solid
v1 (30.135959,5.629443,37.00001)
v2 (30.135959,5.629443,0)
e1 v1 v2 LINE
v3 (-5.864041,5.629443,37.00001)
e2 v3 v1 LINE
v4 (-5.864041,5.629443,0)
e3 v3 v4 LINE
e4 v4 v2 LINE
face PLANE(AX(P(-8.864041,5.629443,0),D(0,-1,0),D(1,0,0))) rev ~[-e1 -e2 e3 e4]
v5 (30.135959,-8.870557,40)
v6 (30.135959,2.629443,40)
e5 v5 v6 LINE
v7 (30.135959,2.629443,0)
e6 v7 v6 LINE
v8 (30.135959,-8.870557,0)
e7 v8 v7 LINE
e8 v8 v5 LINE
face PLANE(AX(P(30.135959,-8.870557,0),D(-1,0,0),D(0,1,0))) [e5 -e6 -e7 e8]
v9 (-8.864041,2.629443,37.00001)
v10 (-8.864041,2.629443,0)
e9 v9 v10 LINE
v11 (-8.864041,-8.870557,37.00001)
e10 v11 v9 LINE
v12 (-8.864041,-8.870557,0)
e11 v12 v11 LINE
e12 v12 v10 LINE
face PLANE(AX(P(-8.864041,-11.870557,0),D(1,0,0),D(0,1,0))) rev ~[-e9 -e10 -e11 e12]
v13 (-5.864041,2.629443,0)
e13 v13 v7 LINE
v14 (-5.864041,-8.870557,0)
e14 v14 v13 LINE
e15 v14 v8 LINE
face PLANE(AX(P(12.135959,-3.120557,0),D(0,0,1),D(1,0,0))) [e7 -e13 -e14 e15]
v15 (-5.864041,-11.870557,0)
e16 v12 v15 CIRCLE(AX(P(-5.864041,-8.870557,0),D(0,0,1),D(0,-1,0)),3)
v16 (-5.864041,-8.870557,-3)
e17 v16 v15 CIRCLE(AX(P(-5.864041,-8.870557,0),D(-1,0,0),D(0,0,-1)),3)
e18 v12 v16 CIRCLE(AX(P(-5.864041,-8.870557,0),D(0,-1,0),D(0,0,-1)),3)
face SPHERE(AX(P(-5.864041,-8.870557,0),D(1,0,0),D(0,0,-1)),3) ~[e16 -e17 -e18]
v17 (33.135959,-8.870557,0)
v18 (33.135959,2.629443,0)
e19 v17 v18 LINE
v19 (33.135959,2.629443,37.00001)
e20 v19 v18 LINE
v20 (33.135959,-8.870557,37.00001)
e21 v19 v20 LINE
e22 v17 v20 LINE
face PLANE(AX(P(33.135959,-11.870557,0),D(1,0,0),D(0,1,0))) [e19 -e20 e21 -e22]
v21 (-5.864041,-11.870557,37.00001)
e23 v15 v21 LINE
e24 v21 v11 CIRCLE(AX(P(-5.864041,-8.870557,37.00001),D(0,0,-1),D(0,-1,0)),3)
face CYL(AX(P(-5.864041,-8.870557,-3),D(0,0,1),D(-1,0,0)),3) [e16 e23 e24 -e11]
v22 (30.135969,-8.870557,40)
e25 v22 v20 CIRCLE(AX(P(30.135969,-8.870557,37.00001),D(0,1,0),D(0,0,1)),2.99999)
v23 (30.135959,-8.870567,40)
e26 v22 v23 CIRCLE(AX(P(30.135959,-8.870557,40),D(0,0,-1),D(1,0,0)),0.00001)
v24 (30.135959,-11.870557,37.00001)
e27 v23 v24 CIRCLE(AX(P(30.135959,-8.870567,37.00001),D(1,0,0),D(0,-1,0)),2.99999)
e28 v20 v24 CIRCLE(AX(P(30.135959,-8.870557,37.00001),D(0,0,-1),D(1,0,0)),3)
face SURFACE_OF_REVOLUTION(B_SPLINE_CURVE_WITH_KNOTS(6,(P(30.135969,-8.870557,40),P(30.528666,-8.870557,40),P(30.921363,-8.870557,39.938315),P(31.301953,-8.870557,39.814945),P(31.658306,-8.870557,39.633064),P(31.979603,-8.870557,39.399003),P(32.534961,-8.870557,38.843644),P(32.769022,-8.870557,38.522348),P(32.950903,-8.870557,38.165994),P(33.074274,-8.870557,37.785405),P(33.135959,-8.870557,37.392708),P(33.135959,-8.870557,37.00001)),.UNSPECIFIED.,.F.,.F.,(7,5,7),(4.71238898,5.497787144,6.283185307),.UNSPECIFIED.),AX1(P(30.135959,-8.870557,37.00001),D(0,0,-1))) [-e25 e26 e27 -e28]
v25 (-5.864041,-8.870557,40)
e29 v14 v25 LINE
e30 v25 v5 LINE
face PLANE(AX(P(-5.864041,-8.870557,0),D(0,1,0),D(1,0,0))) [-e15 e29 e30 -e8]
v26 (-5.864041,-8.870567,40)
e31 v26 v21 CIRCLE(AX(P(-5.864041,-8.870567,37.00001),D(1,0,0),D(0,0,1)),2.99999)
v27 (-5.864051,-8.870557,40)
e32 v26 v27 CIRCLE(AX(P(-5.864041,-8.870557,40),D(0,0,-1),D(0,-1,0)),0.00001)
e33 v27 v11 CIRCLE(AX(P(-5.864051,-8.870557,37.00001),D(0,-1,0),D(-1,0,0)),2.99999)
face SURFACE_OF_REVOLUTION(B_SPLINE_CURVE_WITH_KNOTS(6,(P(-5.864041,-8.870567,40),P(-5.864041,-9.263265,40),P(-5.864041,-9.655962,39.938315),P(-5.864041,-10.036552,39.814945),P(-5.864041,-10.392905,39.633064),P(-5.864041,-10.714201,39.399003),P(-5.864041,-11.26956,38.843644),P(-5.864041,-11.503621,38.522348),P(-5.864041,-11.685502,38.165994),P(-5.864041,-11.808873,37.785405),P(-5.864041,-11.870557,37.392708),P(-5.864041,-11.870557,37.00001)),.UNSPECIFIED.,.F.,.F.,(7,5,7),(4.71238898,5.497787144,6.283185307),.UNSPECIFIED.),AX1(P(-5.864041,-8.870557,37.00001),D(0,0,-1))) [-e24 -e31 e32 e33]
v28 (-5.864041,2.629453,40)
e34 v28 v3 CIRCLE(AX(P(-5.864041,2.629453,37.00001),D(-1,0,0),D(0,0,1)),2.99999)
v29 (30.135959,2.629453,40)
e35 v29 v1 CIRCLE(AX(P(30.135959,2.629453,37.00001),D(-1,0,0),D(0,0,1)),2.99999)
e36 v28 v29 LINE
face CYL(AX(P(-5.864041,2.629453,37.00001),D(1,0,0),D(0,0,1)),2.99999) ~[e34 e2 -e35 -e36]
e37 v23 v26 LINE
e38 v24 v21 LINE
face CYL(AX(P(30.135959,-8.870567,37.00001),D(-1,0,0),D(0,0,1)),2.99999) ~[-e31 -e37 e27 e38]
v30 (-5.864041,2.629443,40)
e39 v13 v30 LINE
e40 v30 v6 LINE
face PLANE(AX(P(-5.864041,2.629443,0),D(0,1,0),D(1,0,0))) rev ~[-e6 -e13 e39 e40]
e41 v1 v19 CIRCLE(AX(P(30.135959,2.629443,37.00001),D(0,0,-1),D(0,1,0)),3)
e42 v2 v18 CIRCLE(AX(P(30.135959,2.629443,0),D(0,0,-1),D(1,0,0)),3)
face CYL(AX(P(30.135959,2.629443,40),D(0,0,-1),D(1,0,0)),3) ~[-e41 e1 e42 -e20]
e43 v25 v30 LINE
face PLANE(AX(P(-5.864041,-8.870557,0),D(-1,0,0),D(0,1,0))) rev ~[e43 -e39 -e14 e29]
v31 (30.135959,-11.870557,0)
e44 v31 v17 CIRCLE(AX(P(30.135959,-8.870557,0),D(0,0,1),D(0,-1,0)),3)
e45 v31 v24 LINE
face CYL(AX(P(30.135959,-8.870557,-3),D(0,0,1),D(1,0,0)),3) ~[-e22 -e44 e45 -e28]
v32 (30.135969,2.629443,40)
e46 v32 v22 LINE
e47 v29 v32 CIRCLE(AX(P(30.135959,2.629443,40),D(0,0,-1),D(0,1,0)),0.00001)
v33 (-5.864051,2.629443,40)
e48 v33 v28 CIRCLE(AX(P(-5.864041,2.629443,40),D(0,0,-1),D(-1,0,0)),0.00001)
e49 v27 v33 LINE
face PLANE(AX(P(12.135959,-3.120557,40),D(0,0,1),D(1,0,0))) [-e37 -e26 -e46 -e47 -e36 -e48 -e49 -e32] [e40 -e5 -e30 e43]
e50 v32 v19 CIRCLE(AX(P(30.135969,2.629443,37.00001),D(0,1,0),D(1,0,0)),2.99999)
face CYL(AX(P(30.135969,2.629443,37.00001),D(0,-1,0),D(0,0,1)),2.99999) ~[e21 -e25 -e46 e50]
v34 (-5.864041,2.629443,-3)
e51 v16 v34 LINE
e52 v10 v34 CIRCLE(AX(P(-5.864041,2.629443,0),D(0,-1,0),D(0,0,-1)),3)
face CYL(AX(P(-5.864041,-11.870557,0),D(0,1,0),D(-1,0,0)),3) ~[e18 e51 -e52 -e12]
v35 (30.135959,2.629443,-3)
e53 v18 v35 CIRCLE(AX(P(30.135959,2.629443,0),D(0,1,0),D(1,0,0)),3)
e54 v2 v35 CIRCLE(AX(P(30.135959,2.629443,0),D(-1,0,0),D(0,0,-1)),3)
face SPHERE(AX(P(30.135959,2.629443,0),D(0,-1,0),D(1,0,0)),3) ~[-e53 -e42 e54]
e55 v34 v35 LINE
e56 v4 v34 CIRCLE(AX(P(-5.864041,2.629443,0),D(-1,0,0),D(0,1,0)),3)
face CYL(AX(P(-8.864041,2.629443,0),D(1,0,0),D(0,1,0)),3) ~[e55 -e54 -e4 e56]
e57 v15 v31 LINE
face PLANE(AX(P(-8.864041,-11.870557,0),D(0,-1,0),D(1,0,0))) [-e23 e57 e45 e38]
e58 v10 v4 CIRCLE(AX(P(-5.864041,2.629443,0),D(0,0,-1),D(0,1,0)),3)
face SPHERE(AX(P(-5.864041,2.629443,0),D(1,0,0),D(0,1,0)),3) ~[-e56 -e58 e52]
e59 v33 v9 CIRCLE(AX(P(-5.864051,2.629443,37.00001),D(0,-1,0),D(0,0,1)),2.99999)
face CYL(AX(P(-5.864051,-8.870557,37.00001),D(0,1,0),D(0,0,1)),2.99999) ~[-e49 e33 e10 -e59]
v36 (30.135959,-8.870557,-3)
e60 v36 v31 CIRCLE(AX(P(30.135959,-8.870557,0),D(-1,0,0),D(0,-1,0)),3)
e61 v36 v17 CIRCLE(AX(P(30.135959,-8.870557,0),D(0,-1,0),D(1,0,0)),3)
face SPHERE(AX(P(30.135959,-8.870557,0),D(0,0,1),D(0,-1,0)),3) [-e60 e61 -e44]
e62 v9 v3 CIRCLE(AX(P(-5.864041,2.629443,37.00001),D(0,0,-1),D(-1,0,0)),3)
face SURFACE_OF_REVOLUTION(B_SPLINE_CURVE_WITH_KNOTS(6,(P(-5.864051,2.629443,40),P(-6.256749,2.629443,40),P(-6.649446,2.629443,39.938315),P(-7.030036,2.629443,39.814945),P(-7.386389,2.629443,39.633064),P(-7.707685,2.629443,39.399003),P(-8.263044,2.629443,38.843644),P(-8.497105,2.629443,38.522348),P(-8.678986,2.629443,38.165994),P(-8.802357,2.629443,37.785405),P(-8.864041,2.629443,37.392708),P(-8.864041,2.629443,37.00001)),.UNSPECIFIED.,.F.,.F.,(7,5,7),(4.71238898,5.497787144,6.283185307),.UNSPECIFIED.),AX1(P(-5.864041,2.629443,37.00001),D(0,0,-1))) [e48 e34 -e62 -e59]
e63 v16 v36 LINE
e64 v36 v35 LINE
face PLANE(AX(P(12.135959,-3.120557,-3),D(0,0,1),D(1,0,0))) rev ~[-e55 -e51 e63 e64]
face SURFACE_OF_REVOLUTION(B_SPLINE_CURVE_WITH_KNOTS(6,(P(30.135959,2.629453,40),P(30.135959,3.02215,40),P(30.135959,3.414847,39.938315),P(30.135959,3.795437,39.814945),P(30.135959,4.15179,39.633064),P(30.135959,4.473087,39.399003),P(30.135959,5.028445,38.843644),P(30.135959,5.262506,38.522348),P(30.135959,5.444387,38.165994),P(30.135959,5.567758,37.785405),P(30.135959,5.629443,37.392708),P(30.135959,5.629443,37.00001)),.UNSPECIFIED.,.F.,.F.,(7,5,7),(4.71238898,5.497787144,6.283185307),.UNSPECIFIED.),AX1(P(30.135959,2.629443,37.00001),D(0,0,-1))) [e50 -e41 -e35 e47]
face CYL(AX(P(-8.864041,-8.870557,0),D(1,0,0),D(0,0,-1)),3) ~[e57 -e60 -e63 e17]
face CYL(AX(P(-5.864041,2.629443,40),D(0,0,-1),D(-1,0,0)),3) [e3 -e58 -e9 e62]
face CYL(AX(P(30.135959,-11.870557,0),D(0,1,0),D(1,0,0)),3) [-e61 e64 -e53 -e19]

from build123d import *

# Parameters (mm, degrees)
F0_W     = 42
F0_H     = 17.5
F0_W_2   = 36
F0_H_2   = 11.5
F1_DEPTH = 40
F2_DEPTH = 3
F3_R     = 3
F4_R     = 2.99999


# Not quite as in the source:
# - a fillet or chamfer is up to 0.001 mm smaller than in the source, because OpenCascade refuses the exact size


with BuildPart() as f1:
    # F0 (on Top) → F1 (new body)
    with BuildSketch(Plane.XY):
        with Locations((12.1359585822, -3.1205574796)):
            Rectangle(F0_W, F0_H)
        with Locations((12.1359585822, -3.1205574796)):
            Rectangle(F0_W_2, F0_H_2, mode=Mode.SUBTRACT)
    extrude(amount=F1_DEPTH)

    # F0 (on Top) → F2 (join)
    with BuildSketch(Plane.XY):
        with Locations((12.1359585822, -3.1205574796)):
            Rectangle(F0_W, F0_H)
        with Locations((12.1359585822, -3.1205574796)):
            Rectangle(F0_W_2, F0_H_2, mode=Mode.SUBTRACT)
        with Locations((12.1359585822, -3.1205574796)):
            Rectangle(F0_W_2, F0_H_2)
    extrude(amount=-F2_DEPTH)

    # F3
    f3_edges = [f1.edges().sort_by_distance(p)[0] for p in [
        (33.135959, -11.870557, 18.5),
        (12.135959, -11.870557, -3),
        (33.135959, -3.120557, -3),
        (33.135959, 5.629443, 18.5),
        (12.135959, 5.629443, -3),
        (-8.864041, 5.629443, 18.5),
        (-8.864041, -3.120557, -3),
        (-8.864041, -11.870557, 18.5),
    ]]
    fillet(f3_edges, radius=F3_R)

    # F4 (radius 3 in the source; OpenCascade refuses exactly that, so slightly less here)
    f4_edges = [f1.edges().sort_by_distance(p)[0] for p in [
        (12.135959, 5.629443, 40),
        (-8.864041, -3.120557, 40),
        (12.135959, -11.870557, 40),
        (33.135959, -3.120557, 40),
    ]]
    fillet(f4_edges, radius=F4_R)


solid = f1.part
